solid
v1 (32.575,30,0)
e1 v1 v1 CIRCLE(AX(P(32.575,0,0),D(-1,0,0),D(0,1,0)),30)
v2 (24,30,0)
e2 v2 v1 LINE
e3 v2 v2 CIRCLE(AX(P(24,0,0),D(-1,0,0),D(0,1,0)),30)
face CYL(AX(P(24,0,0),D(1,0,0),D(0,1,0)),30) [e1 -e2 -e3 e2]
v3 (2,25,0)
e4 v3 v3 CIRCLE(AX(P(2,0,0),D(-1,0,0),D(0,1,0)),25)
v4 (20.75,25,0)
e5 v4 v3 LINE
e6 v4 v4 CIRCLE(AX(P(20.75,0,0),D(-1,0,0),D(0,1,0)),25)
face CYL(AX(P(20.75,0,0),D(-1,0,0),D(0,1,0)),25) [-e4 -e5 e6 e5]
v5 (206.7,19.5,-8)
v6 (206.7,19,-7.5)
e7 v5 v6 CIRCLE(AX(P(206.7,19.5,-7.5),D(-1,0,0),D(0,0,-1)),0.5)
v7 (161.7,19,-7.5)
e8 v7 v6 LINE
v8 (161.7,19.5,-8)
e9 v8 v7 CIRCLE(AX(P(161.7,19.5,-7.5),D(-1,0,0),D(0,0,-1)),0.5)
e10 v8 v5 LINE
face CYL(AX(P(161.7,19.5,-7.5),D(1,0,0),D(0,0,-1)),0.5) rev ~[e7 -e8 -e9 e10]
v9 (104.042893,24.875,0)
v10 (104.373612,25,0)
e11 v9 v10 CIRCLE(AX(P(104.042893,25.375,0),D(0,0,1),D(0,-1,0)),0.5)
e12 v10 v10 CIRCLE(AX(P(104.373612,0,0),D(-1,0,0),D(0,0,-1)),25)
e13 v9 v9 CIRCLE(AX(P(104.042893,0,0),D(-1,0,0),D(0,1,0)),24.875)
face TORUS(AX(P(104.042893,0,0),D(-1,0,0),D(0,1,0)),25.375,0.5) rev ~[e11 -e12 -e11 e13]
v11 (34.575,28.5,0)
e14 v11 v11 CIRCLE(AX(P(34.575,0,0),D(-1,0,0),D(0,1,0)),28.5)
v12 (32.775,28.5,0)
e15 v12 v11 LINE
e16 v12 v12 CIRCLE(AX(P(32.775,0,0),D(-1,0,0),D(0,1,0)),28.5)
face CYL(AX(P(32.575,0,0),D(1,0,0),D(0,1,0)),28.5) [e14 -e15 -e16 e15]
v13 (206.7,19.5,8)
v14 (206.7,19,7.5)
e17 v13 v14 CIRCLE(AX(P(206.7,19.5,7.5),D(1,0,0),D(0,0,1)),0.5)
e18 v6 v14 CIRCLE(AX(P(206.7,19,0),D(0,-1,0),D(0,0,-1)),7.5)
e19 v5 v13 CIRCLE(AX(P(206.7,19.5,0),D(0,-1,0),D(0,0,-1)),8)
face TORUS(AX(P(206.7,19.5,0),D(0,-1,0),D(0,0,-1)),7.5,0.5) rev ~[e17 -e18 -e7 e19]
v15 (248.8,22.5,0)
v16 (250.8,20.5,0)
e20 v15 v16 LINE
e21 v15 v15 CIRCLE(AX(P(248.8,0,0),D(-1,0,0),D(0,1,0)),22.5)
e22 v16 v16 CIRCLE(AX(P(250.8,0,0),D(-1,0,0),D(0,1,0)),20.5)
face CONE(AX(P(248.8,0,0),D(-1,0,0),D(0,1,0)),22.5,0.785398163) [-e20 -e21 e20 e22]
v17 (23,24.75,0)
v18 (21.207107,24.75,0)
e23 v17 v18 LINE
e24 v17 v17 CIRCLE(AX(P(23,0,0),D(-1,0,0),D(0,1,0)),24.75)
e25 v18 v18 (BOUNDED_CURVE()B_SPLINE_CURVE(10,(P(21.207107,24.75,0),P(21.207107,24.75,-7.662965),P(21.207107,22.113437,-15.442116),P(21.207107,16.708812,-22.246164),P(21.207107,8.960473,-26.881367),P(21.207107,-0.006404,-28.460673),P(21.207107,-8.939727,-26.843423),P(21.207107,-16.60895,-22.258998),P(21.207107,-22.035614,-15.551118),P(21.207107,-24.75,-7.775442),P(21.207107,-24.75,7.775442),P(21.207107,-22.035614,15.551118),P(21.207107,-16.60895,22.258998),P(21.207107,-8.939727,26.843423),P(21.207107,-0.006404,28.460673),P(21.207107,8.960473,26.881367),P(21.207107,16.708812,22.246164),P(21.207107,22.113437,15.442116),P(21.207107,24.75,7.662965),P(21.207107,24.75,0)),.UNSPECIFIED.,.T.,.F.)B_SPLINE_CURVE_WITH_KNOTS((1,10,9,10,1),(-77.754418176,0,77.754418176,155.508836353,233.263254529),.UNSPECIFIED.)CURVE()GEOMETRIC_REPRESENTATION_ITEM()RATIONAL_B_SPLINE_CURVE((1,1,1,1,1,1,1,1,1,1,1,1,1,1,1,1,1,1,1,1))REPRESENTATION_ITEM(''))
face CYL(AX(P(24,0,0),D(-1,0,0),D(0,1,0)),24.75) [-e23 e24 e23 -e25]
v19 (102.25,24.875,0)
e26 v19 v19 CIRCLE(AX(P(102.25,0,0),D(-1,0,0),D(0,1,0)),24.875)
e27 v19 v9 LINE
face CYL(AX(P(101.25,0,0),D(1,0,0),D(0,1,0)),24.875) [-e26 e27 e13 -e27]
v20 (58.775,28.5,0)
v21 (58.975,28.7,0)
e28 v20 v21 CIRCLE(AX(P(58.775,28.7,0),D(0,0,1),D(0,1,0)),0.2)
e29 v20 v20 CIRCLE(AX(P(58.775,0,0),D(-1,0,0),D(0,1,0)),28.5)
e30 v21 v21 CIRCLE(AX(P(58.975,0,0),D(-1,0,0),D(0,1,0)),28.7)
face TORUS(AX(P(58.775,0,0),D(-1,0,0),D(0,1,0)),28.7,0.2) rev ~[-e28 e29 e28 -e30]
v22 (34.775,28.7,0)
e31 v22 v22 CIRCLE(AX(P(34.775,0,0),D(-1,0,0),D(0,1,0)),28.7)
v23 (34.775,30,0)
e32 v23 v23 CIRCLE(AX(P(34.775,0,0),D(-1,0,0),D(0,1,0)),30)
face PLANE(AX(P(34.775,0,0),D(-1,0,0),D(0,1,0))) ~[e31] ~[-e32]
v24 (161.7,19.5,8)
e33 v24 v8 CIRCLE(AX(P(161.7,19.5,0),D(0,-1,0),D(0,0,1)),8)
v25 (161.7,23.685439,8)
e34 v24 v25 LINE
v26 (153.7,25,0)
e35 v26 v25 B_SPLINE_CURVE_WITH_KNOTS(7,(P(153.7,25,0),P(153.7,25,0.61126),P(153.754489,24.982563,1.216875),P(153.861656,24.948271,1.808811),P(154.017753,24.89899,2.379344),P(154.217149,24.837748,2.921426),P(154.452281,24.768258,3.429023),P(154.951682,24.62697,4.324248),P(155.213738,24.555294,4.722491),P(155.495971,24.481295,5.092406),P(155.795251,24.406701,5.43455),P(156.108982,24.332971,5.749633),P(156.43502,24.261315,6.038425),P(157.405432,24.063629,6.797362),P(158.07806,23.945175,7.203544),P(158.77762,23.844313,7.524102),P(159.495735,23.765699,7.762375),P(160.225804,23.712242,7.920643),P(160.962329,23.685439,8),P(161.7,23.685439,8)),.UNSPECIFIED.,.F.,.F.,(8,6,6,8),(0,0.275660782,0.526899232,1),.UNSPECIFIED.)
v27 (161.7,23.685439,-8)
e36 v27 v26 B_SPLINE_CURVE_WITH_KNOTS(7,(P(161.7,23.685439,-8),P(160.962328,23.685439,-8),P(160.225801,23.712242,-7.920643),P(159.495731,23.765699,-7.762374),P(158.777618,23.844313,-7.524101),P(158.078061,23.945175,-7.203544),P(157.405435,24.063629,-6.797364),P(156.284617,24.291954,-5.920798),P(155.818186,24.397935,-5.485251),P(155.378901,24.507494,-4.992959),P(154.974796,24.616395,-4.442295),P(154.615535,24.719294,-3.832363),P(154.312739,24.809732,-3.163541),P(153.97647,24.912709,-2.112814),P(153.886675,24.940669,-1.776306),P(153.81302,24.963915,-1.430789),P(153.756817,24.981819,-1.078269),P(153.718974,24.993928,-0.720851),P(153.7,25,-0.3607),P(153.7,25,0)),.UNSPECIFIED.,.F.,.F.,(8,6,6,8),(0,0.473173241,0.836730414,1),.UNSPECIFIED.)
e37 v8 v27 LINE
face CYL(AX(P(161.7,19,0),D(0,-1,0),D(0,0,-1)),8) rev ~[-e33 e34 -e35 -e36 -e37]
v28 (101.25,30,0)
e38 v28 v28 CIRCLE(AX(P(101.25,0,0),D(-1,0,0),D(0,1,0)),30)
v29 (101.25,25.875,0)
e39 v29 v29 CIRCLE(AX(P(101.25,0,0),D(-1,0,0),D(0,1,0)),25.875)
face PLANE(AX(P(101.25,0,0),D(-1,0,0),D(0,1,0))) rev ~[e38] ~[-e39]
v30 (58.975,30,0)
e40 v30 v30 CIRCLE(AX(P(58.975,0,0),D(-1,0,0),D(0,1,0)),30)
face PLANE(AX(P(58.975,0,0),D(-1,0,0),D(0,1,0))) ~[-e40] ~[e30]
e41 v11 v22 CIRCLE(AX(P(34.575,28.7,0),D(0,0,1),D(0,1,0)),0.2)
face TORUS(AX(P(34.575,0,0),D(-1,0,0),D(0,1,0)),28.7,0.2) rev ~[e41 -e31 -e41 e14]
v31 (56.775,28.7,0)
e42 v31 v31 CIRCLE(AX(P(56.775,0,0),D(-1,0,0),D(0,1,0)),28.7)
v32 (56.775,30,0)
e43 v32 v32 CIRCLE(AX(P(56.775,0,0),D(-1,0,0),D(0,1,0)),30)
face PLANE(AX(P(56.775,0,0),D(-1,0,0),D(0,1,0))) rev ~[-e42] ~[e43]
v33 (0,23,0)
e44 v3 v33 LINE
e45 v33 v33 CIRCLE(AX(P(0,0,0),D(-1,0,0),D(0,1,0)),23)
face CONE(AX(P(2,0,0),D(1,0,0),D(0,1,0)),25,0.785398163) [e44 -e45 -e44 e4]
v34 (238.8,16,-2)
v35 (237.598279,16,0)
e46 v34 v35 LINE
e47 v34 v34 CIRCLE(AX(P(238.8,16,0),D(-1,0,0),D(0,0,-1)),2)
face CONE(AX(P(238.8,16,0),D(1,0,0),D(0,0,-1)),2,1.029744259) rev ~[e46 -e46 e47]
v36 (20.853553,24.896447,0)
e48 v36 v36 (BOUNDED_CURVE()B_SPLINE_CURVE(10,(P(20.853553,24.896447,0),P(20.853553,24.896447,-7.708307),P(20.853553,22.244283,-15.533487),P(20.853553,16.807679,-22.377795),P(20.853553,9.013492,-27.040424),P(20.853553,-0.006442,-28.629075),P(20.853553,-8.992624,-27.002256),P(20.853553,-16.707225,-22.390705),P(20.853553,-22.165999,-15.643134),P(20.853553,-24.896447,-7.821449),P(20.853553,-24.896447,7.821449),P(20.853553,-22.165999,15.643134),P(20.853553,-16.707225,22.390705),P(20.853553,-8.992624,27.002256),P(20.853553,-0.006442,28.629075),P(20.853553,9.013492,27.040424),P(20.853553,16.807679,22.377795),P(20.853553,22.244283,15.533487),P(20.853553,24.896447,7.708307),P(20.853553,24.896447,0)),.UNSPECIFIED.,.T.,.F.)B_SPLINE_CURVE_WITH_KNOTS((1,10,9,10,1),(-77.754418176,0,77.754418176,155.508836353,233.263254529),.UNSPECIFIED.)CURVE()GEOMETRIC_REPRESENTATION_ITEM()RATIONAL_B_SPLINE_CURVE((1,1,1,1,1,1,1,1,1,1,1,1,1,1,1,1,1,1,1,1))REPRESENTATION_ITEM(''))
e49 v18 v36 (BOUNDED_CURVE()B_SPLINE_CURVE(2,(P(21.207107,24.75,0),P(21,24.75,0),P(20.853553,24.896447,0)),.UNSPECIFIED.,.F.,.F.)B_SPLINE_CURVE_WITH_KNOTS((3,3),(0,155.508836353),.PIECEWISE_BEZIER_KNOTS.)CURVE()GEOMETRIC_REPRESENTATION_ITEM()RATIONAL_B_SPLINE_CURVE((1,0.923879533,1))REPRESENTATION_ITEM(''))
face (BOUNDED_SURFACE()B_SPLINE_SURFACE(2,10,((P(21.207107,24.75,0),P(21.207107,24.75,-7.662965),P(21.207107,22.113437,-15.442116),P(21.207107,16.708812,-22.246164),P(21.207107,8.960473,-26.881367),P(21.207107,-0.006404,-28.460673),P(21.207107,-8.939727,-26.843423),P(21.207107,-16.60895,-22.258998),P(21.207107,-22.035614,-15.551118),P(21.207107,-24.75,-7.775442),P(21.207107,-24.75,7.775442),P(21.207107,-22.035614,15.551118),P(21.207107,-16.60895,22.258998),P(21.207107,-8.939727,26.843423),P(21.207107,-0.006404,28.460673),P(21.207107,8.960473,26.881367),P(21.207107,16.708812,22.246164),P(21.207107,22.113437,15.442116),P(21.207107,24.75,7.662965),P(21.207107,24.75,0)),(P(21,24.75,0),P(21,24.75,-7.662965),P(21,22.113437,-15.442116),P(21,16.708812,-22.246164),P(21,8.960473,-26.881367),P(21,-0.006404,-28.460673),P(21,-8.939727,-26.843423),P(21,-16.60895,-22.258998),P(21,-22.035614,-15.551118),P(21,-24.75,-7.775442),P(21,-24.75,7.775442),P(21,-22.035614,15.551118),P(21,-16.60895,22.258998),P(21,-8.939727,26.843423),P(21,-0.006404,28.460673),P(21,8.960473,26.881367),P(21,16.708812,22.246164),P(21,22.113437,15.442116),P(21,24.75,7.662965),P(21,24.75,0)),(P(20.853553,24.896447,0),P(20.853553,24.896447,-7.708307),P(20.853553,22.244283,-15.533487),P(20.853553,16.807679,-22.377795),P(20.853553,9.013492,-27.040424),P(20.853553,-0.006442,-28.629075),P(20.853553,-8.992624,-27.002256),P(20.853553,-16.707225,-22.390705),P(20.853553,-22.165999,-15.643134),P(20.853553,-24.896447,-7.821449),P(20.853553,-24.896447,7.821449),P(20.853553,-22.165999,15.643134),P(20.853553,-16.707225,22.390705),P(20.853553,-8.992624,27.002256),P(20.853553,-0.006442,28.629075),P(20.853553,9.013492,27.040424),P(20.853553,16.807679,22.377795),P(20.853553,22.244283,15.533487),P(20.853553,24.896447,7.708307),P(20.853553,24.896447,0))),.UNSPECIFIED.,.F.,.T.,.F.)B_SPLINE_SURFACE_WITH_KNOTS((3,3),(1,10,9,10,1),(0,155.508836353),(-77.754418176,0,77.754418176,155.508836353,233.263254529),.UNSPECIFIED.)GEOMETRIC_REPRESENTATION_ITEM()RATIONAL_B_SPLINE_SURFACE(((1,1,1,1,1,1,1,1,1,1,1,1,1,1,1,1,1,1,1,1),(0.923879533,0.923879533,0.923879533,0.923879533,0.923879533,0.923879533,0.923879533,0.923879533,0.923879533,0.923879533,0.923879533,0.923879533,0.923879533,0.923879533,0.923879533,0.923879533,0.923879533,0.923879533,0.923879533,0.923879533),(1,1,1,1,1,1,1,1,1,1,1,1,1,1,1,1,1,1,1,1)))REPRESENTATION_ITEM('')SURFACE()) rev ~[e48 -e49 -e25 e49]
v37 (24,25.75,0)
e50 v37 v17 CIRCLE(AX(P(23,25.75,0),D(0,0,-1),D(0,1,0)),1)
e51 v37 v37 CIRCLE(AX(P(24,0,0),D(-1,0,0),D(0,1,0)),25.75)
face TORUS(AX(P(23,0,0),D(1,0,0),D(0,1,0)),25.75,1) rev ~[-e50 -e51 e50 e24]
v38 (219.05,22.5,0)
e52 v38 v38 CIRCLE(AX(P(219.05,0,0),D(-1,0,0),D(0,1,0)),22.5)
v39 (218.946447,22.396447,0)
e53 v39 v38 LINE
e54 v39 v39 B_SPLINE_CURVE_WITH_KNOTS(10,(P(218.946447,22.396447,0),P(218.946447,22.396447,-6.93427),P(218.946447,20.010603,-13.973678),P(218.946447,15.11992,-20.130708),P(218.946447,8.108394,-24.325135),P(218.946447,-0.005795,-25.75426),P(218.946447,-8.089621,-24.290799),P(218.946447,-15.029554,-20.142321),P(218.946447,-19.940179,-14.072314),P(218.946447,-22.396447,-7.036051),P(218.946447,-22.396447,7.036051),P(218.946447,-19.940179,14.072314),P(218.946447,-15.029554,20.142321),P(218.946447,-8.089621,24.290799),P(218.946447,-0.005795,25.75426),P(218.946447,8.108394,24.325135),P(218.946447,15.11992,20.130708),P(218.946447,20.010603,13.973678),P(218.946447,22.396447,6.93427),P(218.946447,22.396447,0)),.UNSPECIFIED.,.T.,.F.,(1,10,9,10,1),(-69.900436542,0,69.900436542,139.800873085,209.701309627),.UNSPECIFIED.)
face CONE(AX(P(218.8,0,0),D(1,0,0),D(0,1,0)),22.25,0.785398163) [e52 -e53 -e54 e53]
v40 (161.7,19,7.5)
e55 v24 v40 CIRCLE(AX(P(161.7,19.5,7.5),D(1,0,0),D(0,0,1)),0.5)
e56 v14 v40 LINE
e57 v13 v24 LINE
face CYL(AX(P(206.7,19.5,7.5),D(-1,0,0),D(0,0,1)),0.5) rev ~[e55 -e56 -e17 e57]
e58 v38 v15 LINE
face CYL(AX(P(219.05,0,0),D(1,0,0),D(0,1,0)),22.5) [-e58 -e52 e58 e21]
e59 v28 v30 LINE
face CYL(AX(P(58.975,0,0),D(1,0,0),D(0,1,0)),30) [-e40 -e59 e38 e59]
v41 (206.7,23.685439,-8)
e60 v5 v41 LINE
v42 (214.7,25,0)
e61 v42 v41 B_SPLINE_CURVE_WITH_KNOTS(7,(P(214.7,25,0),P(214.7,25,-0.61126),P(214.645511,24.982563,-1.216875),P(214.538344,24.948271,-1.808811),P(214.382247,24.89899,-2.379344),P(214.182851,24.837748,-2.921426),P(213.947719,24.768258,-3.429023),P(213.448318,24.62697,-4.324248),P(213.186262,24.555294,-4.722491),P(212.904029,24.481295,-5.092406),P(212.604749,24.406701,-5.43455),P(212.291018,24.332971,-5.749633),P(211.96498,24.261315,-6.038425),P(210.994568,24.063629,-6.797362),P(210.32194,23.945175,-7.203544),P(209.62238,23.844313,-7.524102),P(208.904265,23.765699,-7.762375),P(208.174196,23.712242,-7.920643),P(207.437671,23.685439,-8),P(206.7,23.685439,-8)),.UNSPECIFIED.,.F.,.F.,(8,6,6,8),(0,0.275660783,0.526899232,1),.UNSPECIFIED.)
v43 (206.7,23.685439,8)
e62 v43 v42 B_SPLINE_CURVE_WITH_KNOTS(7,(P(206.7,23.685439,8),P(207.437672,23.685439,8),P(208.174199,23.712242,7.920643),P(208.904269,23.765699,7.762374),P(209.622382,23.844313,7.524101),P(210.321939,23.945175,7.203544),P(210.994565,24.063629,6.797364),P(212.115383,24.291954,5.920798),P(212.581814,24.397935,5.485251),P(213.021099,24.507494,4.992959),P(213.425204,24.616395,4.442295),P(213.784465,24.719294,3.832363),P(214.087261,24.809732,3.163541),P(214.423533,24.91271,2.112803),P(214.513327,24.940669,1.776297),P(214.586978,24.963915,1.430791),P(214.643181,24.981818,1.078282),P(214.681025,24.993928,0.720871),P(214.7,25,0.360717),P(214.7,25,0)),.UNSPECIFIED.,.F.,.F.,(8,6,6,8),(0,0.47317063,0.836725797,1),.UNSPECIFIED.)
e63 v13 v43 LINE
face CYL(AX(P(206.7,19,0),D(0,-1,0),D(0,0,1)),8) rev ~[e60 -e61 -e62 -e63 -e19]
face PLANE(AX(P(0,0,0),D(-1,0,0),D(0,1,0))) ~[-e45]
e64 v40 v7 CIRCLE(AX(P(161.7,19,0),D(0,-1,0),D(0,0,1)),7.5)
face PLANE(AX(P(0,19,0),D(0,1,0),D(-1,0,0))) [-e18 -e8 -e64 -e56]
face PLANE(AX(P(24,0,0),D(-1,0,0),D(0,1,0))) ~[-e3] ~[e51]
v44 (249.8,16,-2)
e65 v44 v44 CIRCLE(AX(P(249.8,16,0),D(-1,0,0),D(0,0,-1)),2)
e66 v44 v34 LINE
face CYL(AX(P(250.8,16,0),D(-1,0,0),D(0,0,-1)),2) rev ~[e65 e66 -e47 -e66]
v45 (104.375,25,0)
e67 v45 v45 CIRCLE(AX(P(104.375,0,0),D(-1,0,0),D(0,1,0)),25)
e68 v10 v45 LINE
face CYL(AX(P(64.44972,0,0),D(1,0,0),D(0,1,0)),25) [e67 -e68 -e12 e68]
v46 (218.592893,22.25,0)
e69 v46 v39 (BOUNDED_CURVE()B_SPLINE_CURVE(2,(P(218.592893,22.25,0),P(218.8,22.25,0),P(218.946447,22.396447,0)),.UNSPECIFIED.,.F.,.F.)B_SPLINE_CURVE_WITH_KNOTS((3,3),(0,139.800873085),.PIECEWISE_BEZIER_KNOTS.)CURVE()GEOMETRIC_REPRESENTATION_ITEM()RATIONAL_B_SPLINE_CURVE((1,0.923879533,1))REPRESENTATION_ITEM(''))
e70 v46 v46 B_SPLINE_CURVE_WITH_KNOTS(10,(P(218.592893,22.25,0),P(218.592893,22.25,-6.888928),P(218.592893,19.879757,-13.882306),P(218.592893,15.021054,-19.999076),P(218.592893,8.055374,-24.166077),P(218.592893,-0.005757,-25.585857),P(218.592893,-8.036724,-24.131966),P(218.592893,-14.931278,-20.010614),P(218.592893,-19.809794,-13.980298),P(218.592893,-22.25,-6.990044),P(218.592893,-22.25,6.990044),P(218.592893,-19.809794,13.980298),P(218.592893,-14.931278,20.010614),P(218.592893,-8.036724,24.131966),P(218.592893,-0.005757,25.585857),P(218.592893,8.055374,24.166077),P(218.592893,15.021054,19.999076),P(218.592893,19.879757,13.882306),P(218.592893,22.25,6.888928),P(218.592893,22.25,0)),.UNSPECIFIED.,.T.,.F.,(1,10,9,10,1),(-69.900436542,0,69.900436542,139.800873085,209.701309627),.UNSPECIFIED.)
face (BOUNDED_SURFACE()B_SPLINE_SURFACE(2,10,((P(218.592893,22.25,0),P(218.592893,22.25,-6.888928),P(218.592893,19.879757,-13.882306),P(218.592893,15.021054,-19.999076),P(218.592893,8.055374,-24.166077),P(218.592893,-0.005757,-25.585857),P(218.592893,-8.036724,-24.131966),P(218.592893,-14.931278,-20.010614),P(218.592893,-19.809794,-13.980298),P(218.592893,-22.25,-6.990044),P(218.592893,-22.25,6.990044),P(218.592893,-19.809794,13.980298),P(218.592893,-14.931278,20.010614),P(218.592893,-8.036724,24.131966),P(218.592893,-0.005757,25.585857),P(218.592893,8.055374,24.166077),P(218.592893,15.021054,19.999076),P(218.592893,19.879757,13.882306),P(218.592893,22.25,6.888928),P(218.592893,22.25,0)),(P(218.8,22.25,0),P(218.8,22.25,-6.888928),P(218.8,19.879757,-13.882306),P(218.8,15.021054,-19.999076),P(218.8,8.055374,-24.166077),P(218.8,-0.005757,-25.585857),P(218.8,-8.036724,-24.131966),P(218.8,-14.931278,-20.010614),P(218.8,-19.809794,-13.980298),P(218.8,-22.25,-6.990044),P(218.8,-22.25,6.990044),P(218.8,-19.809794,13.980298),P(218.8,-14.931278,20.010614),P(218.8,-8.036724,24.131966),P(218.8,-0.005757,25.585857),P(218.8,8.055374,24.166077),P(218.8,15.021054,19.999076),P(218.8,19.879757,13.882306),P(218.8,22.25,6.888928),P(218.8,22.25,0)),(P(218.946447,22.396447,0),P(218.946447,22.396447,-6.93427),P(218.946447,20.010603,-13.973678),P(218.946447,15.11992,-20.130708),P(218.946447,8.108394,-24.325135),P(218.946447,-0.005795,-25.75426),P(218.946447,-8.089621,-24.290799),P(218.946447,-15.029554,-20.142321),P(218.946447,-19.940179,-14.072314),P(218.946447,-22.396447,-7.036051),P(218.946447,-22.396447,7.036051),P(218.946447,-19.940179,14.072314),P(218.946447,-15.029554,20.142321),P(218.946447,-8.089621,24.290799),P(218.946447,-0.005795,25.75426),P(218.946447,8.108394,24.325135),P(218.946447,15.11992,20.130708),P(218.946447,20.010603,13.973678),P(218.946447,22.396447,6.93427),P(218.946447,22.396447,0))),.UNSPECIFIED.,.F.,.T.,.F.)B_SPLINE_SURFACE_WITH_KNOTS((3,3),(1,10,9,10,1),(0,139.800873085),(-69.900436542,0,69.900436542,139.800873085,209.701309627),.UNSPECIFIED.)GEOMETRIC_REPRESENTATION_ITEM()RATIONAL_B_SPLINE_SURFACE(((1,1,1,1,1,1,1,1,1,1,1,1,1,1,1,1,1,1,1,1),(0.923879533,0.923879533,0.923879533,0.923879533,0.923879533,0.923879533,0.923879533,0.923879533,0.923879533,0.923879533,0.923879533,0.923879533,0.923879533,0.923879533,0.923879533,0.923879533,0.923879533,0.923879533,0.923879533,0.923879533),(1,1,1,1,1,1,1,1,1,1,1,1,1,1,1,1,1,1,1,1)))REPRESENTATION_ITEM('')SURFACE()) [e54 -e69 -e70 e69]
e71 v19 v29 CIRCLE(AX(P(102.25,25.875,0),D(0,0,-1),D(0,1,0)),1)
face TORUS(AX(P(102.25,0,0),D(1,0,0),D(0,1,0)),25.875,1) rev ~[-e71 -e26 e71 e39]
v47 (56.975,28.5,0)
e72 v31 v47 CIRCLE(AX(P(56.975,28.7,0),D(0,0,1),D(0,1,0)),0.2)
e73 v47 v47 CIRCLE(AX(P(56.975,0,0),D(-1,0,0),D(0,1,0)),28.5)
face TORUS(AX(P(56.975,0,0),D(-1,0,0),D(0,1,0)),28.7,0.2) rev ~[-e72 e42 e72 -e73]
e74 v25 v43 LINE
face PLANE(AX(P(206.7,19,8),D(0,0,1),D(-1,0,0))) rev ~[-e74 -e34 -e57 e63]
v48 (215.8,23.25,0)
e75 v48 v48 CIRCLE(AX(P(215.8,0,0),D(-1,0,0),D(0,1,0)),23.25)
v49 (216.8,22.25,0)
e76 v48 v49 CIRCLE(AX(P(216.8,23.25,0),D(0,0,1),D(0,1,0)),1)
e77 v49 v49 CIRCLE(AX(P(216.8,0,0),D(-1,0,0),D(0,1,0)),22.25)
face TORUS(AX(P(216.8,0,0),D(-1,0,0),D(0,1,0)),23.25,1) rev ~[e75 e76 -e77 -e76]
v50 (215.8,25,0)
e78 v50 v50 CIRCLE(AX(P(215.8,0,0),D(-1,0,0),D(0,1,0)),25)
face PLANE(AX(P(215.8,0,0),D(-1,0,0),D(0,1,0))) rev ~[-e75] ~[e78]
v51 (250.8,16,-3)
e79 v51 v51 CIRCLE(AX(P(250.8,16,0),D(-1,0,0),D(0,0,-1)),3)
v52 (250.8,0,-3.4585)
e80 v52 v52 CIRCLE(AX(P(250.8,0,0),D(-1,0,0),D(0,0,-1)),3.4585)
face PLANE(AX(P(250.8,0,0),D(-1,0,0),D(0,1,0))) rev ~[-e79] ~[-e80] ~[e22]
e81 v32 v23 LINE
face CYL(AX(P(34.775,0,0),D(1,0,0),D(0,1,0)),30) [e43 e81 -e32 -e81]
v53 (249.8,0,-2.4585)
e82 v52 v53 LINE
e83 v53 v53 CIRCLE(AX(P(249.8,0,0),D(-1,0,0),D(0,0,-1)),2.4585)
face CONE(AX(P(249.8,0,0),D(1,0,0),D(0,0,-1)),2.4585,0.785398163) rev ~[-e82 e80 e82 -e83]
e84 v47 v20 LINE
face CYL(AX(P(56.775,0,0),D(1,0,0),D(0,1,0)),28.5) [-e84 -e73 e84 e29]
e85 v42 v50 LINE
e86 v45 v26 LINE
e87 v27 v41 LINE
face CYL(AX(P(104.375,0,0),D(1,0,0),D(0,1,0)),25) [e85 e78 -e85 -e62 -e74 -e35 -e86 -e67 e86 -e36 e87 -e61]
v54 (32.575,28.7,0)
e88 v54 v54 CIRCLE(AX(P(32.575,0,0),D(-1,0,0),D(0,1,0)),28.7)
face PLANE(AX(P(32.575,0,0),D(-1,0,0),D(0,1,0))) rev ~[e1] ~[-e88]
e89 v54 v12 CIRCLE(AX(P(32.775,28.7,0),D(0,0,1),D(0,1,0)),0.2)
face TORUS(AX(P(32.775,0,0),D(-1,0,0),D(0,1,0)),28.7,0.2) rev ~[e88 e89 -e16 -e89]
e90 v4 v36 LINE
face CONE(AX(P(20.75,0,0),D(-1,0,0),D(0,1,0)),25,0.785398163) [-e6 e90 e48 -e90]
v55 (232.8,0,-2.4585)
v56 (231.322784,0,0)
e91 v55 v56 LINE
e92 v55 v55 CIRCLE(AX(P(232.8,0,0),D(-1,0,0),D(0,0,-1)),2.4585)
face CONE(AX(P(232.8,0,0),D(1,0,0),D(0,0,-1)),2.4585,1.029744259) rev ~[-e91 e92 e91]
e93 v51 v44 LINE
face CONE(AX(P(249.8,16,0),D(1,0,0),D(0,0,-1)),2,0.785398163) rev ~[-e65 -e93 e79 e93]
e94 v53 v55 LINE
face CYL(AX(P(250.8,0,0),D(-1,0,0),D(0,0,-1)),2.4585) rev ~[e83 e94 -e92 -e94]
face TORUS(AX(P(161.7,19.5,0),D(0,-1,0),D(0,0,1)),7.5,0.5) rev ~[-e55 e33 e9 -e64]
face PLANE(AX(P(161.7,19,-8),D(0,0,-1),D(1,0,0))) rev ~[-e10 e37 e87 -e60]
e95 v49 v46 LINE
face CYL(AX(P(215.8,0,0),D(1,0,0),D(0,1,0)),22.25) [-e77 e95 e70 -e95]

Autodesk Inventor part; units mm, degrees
ref_plane "YZ Plane" through (0, 0, 0) normal (1, 0, 0) x (0, 1, 0)
ref_plane "XY Plane" through (0, 0, 0) normal (0, 0, 1) x (1, 0, 0)
sketch "Эскиз1" plane through (0, 0, 0) normal (0, 0, 1) x (1, 0, 0)
  line L0 (0, 0) -> (0, 25)
  line L1 (24, 25) -> (24, 30)
  line L2 (32.575, 30) -> (32.575, 28.5)
  line L3 (32.575, 28.5) -> (34.775, 28.5)
  line L4 (34.775, 28.5) -> (34.775, 30)
  line L5 (94.5, 30) -> (101.25, 30)
  line L6 (101.25, 30) -> (101.25, 25)
  line L7 (215.8, 25) -> (215.8, 22.5)
  line L8 (250.8, 22.5) -> (250.8, 0)
  line L9 (250.8, 0) -> (0, 0)
  line L10 (101.25, 25) -> (101.25, 24.875)
  line L11 (101.25, 24.875) -> (104.25, 24.875)
  line L12 (104.25, 24.875) -> (104.375, 25)
  line L13 (104.375, 25) -> (215.8, 25)
  line L14 (24, 25) -> (24, 24.75)
  line L15 (24, 24.75) -> (21, 24.75)
  line L16 (20.75, 25) -> (0, 25)
  line L17 (20.75, 25) -> (21, 24.75)
  line L18 (215.8, 22.5) -> (215.8, 22.25)
  line L19 (215.8, 22.25) -> (218.8, 22.25)
  line L20 (218.8, 22.25) -> (219.05, 22.5)
  line L21 (219.05, 22.5) -> (250.8, 22.5)
  line L22 (24, 30) -> (32.575, 30)
  line L23 (34.775, 30) -> (35.7524, 30)
  line L24 (35.7524, 30) -> (56.775, 30)
  line L25 (60.3, 30) -> (92.3, 30)
  line L26 (56.775, 30) -> (56.775, 28.5)
  line L27 (56.775, 28.5) -> (58.975, 28.5)
  line L28 (58.975, 28.5) -> (58.975, 30)
  line L29 (58.975, 30) -> (60.3, 30)
  line L30 (92.3, 30) -> (94.8795, 30)
  point P0 (92.3, 28.5)
  point P1 (94.5, 28.5)
  dimension "d4" = 24
  dimension "d6" = 2.2
  dimension "d7" = 57
  dimension "d12" = 35
  dimension "d13" = 250.8
  dimension "d49" = 45
  dimension "d50" = 3
  dimension "d51" = 50
  dimension "d52" = 49.75
  dimension "d55" = 50
  dimension "d56" = 0.25
  dimension "d57" = 45
  dimension "d58" = 3
  dimension "d61" = 45
  dimension "d62" = 45
  dimension "d63" = 0.25
  dimension "d64" = 3
  dimension "d67" = 10.775
  dimension "d70" = 77.25
  dimension "d72" = 60
  dimension "d73" = 60
  dimension "d74" = 60
  dimension "d76" = 2.2
  dimension "d77" = 57
  dimension "d78" = 22
revolve "Вращение1" add sketch "Эскиз1" angle 360 about axis through (250.8, 0, 0) along (-1, 0, 0)
fillet "Сопряжение1" radius 0.2 2 edges at (32.575, -28.5, 0) (34.775, -28.5, 0)
ref_plane "РабПлоскость1" through (0, 19, 0) normal (0, 1, 0) x (-1, 0, 0)
sketch "Эскиз2" plane through (0, 19, 0) normal (0, 1, 0) x (-1, 0, 0)
  line L0 (-161.7, -8) -> (-206.7, -8)
  line L1 (-206.7, -8) -> (-206.7, 8)
  line L2 (-206.7, 8) -> (-161.7, 8)
  line L3 (-161.7, 8) -> (-161.7, -8)
  line L4 (-103.5, 25) -> (-103.5, -25) projected
  arc A0 (-161.7, -8) -> (-161.7, 8) centre (-161.7, 0) ccw
  arc A1 (-206.7, 8) -> (-206.7, -8) centre (-206.7, 0) ccw
  point P0 (0, 0)
  dimension "d17" = 45
  dimension "d18" = 16
  dimension "d19" = 8
  dimension "d20" = 58.2
extrude "Выдавливание1" cut sketch "Эскиз2" along normal blind 65.75
chamfer "Фаска1" distance 2 angle 45 2 edges at (250.8, -22.5, 0) (0, -25, 0)
fillet "Сопряжение3" radius 1 1 edges at (215.8, -22.25, 0)
fillet "Сопряжение3" radius 0.5 1 edges at (218.8, -22.25, 0)
sketch "Эскиз3" plane through (250.8, 0, 0) normal (1, 0, 0) x (0, 0, -1)
  circle A0 centre (0, 0) radius 22.5 projected
  circle A1 centre (0, 16) radius 2
  circle A2 centre (0, 0) radius 2.9879
  dimension "d28" = 45
  dimension "d29" = 16
  dimension "d30" = 4
hole "Отверстие1" at (250.8, 16, 0) direction (-1, 0, 0) diameter 4 depth 12 tip angle 118
hole "Отверстие2" at (250.8, 0, 0) direction (-1, 0, 0) diameter 4.917 depth 18 tip angle 118 thread size "M6x1" class "6H" standard "ISO Metric profile"
chamfer "Фаска2" distance 1 angle 45 2 edges at (250.8, 0, 2.4585) (250.8, 16, 2)
fillet "Сопряжение4" radius 0.5 4 edges at (184.2, 19, 8) (214.7, 19, 0) (184.2, 19, -8) (153.7, 19, 0)
fillet "Сопряжение5" radius 1 1 edges at (101.25, -24.875, 0)
fillet "Сопряжение6" radius 0.5 1 edges at (104.25, -24.875, 0)
fillet "Сопряжение7" radius 0.5 1 edges at (21, -24.75, 0)
fillet "Сопряжение7" radius 1 1 edges at (24, -24.75, 0)
fillet "Сопряжение8" [suppressed]
fillet "Сопряжение9" radius 0.2 2 edges at (56.775, -28.5, 0) (58.975, -28.5, 0)
equation "\"d19\" = 0.5 * d18"
properties part number "Тихоходный валл"
